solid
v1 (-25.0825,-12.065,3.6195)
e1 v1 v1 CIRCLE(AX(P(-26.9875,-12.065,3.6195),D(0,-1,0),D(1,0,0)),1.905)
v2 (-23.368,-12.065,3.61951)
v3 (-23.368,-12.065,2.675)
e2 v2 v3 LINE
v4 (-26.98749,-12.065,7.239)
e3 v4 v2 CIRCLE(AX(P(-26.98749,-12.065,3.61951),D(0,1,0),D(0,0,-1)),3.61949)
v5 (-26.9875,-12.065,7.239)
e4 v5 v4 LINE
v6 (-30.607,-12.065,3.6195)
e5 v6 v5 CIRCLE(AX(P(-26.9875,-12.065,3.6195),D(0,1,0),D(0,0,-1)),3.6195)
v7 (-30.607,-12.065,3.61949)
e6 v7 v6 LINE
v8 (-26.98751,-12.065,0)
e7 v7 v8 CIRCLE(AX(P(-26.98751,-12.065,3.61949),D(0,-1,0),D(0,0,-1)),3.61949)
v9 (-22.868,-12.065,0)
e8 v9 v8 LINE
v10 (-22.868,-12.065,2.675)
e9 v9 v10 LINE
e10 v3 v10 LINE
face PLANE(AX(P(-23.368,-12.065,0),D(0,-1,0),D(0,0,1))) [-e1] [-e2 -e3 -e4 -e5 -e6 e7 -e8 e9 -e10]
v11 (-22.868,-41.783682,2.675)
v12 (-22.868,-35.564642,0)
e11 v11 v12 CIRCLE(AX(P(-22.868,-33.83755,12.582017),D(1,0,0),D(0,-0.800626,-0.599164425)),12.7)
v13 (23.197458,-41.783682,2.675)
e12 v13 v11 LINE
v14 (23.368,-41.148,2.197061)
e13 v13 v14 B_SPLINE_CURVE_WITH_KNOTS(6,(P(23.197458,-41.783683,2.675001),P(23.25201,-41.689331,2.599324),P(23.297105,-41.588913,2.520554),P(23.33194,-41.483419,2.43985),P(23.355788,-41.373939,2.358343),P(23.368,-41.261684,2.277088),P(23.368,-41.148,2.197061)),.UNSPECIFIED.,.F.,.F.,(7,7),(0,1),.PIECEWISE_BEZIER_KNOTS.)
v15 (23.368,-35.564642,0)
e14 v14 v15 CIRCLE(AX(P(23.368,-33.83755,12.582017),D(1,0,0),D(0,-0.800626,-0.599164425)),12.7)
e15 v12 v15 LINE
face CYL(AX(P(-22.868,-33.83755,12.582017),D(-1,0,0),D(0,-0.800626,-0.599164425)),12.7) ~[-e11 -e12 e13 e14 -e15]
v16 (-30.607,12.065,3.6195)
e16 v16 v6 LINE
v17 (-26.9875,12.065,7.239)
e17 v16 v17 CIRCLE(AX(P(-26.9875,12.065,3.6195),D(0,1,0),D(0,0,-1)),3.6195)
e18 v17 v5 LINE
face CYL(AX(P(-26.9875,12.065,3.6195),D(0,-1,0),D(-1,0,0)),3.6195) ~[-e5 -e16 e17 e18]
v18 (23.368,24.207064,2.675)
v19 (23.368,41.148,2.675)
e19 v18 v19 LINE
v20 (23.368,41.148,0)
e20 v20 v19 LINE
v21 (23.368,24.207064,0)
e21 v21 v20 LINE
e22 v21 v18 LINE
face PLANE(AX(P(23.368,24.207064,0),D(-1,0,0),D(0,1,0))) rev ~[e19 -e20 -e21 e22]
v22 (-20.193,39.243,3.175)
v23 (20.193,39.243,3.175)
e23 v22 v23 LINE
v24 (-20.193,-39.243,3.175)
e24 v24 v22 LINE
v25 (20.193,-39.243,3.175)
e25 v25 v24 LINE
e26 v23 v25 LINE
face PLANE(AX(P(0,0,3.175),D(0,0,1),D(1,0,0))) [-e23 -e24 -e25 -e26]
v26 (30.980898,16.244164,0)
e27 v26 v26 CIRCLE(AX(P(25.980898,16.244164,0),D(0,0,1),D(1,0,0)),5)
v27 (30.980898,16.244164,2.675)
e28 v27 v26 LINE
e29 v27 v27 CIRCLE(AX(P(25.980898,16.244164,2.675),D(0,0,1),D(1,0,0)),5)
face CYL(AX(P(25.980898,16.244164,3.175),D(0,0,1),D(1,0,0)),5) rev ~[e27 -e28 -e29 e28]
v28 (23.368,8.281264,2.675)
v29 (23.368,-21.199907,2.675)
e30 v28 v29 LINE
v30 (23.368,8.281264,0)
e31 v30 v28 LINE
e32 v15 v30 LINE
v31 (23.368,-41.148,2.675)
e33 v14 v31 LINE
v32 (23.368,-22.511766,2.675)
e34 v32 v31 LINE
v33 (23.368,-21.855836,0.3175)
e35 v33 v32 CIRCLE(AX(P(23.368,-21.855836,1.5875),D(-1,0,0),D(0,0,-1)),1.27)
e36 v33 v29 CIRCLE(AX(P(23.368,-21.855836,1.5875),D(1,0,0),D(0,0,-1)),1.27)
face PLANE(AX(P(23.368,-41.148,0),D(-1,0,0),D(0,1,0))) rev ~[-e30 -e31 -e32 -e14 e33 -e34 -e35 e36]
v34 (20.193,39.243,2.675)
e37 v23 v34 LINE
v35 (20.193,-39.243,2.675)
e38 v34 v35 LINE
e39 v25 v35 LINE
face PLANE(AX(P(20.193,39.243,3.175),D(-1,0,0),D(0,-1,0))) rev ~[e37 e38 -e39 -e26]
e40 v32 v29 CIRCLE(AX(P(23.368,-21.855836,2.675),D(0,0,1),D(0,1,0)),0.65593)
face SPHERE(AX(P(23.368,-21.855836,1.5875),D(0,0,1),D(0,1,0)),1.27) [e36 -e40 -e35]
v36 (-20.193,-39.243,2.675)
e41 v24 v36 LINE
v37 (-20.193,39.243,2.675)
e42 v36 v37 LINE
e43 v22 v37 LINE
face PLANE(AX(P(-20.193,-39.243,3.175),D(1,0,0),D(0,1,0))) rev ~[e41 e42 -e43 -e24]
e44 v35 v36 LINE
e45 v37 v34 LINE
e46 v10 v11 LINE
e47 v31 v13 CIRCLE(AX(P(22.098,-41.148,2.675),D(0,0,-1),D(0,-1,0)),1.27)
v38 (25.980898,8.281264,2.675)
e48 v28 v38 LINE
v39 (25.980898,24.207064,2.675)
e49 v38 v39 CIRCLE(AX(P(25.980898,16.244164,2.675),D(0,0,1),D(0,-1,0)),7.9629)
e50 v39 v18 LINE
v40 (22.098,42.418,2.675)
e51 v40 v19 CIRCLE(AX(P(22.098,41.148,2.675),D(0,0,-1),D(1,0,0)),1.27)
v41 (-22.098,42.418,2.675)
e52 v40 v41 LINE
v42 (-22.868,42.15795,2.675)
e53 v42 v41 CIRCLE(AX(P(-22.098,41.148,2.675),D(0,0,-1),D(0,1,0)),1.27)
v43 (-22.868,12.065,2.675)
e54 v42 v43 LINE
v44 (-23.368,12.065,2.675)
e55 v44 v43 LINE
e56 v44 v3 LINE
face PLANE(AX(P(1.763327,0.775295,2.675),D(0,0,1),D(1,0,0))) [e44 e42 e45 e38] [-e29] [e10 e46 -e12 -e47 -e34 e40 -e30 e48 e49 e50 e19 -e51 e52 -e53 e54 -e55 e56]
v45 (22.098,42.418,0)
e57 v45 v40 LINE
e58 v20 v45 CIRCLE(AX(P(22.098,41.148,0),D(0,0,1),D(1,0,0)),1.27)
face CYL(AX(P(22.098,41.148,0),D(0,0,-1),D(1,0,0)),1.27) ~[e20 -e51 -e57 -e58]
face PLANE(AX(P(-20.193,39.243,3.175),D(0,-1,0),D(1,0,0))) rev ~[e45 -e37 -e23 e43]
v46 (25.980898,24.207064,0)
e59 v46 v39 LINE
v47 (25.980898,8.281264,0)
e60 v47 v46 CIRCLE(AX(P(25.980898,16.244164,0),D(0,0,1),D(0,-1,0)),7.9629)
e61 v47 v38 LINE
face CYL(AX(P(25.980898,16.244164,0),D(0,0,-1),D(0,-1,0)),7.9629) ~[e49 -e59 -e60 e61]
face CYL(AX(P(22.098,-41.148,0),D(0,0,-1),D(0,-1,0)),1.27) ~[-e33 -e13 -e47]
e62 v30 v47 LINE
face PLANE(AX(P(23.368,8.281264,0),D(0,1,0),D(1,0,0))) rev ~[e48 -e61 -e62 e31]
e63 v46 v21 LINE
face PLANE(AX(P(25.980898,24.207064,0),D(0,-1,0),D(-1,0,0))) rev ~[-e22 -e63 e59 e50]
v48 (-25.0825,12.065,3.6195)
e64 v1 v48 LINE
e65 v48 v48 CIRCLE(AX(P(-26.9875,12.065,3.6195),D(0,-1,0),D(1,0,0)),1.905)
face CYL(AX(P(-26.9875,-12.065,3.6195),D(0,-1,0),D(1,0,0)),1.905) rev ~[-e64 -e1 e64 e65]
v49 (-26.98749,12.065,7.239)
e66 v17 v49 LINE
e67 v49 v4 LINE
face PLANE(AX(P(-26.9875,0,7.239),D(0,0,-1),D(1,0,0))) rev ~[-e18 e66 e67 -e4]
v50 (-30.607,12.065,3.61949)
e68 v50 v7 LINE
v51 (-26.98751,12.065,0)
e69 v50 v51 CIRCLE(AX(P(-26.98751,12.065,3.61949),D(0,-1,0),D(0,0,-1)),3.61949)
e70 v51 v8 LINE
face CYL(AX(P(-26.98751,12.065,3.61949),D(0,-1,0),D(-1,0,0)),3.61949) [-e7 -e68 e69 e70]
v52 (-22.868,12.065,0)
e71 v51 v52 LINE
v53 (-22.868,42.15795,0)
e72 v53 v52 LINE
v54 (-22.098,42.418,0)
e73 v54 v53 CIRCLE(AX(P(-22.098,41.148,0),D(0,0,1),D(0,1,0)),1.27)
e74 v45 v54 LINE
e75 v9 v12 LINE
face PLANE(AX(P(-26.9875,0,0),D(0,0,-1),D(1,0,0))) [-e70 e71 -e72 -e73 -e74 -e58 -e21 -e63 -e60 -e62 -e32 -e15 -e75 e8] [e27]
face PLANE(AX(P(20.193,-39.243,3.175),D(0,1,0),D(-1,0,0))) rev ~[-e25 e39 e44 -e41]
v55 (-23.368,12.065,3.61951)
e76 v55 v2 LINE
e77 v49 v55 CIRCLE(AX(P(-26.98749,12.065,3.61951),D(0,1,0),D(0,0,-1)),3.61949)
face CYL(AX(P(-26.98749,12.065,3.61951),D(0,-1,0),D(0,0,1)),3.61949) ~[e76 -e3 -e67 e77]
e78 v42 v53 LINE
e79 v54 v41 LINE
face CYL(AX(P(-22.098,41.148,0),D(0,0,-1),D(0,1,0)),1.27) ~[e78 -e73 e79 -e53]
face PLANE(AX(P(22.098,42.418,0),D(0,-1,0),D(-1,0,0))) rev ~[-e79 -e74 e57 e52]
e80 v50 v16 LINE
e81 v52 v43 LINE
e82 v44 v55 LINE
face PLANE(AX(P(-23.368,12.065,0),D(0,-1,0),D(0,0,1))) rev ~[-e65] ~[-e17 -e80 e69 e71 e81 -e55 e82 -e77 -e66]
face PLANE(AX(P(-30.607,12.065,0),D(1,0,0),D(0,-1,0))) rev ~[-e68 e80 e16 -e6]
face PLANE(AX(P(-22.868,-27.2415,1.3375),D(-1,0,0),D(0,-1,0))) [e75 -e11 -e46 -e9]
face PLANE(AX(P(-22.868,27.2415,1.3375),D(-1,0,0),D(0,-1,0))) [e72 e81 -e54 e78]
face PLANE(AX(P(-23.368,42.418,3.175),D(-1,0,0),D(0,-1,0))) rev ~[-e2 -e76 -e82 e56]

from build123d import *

# Parameters (mm, degrees)
F1_DEPTH  = 3.175
F2_R      = 5
F3_DEPTH  = 3.175
F4_W      = 7.239
F4_H      = 24.13
F5_DEPTH  = 7.239
F6_R      = 1.905
F7_DEPTH  = 25.4
F8_R      = 3.6195
F9_R      = 3.61949
F10_R     = 3.61949
F13_W     = 3.2799700804
F13_H     = 6.7503359169
F14_DEPTH = 0.5
F15_W     = 30.353
F15_H     = 2.675
F16_DEPTH = 0.5
F18_DEPTH = 46.236


# Not quite as in the source:
# - a fillet or chamfer is up to 0.001 mm smaller than in the source, because OpenCascade refuses the exact size


with BuildPart() as f1:
    # F0 (on Top) → F1 (new body)
    with BuildSketch(Plane.XY):
        with BuildLine():
            ThreePointArc((23.368, 41.148), (22.9960256121, 42.0460256121), (22.098, 42.418))
            Line((22.098, 42.418), (-22.098, 42.418))
            ThreePointArc((-22.098, 42.418), (-22.9960256121, 42.0460256121), (-23.368, 41.148))
            Line((-23.368, 41.148), (-23.368, -41.148))
            ThreePointArc((-23.368, -41.148), (-22.9960256121, -42.0460256121), (-22.098, -42.418))
            Line((-22.098, -42.418), (22.098, -42.418))
            ThreePointArc((22.098, -42.418), (22.9960256121, -42.0460256121), (23.368, -41.148))
            Line((23.368, -41.148), (23.368, 8.2812636))
            Line((23.368, 8.2812636), (23.368, 24.2070636))
            Line((23.368, 24.2070636), (23.368, 41.148))
        make_face()
        with BuildLine():
            Line((25.980898, 24.2070636), (23.368, 24.2070636))
            Line((23.368, 24.2070636), (23.368, 8.2812636))
            Line((23.368, 8.2812636), (25.980898, 8.2812636))
            ThreePointArc((25.980898, 8.2812636), (33.943798, 16.2441636), (25.980898, 24.2070636))
        make_face()
    extrude(amount=F1_DEPTH)

    # F2 (on face) → F3 (cut)
    with BuildSketch(Plane.XY.offset(3.175)):
        with Locations((25.980898, 16.2441636)):
            Circle(F2_R)
    extrude(amount=-F3_DEPTH, mode=Mode.SUBTRACT)

    # F4 (on face) → F5 (join)
    with BuildSketch(Plane(origin=(0, 0, 0), x_dir=(1, 0, 0), z_dir=(0, 0, -1))):
        with Locations((-26.9875, 0)):
            Rectangle(F4_W, F4_H)
    extrude(amount=-F5_DEPTH)

    # F6 (on face) → F7 (cut)
    with BuildSketch(Plane.XZ.offset(12.065)):
        with Locations((-26.9875, 3.6195)):
            Circle(F6_R)
    extrude(amount=-F7_DEPTH, mode=Mode.SUBTRACT)

    # F8
    f8_edges = [f1.edges().sort_by_distance(p)[0] for p in [
        (-30.607, 0, 7.239),
    ]]
    fillet(f8_edges, radius=F8_R)

    # F9 (radius 3.6195 in the source; OpenCascade refuses exactly that, so slightly less here)
    f9_edges = [f1.edges().sort_by_distance(p)[0] for p in [
        (-23.368, 0, 7.239),
    ]]
    fillet(f9_edges, radius=F9_R)

    # F10 (radius 3.6195 in the source; OpenCascade refuses exactly that, so slightly less here)
    f10_edges = [f1.edges().sort_by_distance(p)[0] for p in [
        (-30.607, 0, 0),
    ]]
    fillet(f10_edges, radius=F10_R)

    # F11 (on face) → F12 (revolve)
    with BuildSketch(Plane.YZ.offset(23.368)):
        with BuildLine():
            Line((-21.8558364, 2.8575), (-21.8558364, 0.3175))
            ThreePointArc((-21.8558364, 0.3175), (-20.5858364, 1.5875), (-21.8558364, 2.8575))
        make_face()
    revolve(axis=Axis((23.368, -21.8558364, 1.4411548618), (0, 0, 1)))

    # F13 (on face) → F14 (cut)
    with BuildSketch(Plane.XY.offset(3.175)):
        with BuildLine():
            Line((-23.368, -12.065), (-23.368, -42.418))
            Line((-23.368, -42.418), (23.368, -42.418))
            Line((23.368, -42.418), (23.368, -25.3541376442))
            Line((23.368, -25.3541376442), (23.368, -18.6038017273))
            Line((23.368, -18.6038017273), (23.368, 8.2812636))
            Line((23.368, 8.2812636), (25.980898, 8.2812636))
            ThreePointArc((25.980898, 8.2812636), (33.943798, 16.2441636), (25.980898, 24.2070636))
            Line((25.980898, 24.2070636), (23.368, 24.2070636))
            Line((23.368, 24.2070636), (23.368, 42.418))
            Line((23.368, 42.418), (-23.368, 42.418))
            Line((-23.368, 42.418), (-23.368, 12.065))
            Line((-23.368, 12.065), (-23.368, -12.065))
        make_face()
        Polygon((-20.193, 39.243), (20.193, 39.243), (20.193, 22.1750636), (20.193, 10.3132636), (20.193, -39.243), (-20.193, -39.243), (-20.193, -12.065), (-20.193, 12.065), align=None, mode=Mode.SUBTRACT)
        with Locations((25.0079850402, -21.9789696857)):
            Rectangle(F13_W, F13_H)
    extrude(amount=-F14_DEPTH, mode=Mode.SUBTRACT)

    # F15 (on face) → F16 (cut)
    with BuildSketch(Plane(origin=(-23.368, 0, 0), x_dir=(0, -1, 0), z_dir=(-1, 0, 0))):
        with Locations((-27.2415, 1.3375)):
            Rectangle(F15_W, F15_H)
        with Locations((27.2415, 1.3375)):
            Rectangle(F15_W, F15_H)
    extrude(amount=-F16_DEPTH, mode=Mode.SUBTRACT)

    # F17 (on face) → F18 (cut, through all)
    with BuildSketch(Plane(origin=(-22.868, 0, 0), x_dir=(0, -1, 0), z_dir=(-1, 0, 0))):
        with BuildLine():
            ThreePointArc((44.0055, 4.9726288032), (40.2838486613, 1.63965752), (35.5646422155, 0))
            Line((35.5646422155, 0), (44.0055, 0))
            Line((44.0055, 0), (44.0055, 4.9726288032))
        make_face()
    extrude(amount=-F18_DEPTH, mode=Mode.SUBTRACT)


solid = f1.part
